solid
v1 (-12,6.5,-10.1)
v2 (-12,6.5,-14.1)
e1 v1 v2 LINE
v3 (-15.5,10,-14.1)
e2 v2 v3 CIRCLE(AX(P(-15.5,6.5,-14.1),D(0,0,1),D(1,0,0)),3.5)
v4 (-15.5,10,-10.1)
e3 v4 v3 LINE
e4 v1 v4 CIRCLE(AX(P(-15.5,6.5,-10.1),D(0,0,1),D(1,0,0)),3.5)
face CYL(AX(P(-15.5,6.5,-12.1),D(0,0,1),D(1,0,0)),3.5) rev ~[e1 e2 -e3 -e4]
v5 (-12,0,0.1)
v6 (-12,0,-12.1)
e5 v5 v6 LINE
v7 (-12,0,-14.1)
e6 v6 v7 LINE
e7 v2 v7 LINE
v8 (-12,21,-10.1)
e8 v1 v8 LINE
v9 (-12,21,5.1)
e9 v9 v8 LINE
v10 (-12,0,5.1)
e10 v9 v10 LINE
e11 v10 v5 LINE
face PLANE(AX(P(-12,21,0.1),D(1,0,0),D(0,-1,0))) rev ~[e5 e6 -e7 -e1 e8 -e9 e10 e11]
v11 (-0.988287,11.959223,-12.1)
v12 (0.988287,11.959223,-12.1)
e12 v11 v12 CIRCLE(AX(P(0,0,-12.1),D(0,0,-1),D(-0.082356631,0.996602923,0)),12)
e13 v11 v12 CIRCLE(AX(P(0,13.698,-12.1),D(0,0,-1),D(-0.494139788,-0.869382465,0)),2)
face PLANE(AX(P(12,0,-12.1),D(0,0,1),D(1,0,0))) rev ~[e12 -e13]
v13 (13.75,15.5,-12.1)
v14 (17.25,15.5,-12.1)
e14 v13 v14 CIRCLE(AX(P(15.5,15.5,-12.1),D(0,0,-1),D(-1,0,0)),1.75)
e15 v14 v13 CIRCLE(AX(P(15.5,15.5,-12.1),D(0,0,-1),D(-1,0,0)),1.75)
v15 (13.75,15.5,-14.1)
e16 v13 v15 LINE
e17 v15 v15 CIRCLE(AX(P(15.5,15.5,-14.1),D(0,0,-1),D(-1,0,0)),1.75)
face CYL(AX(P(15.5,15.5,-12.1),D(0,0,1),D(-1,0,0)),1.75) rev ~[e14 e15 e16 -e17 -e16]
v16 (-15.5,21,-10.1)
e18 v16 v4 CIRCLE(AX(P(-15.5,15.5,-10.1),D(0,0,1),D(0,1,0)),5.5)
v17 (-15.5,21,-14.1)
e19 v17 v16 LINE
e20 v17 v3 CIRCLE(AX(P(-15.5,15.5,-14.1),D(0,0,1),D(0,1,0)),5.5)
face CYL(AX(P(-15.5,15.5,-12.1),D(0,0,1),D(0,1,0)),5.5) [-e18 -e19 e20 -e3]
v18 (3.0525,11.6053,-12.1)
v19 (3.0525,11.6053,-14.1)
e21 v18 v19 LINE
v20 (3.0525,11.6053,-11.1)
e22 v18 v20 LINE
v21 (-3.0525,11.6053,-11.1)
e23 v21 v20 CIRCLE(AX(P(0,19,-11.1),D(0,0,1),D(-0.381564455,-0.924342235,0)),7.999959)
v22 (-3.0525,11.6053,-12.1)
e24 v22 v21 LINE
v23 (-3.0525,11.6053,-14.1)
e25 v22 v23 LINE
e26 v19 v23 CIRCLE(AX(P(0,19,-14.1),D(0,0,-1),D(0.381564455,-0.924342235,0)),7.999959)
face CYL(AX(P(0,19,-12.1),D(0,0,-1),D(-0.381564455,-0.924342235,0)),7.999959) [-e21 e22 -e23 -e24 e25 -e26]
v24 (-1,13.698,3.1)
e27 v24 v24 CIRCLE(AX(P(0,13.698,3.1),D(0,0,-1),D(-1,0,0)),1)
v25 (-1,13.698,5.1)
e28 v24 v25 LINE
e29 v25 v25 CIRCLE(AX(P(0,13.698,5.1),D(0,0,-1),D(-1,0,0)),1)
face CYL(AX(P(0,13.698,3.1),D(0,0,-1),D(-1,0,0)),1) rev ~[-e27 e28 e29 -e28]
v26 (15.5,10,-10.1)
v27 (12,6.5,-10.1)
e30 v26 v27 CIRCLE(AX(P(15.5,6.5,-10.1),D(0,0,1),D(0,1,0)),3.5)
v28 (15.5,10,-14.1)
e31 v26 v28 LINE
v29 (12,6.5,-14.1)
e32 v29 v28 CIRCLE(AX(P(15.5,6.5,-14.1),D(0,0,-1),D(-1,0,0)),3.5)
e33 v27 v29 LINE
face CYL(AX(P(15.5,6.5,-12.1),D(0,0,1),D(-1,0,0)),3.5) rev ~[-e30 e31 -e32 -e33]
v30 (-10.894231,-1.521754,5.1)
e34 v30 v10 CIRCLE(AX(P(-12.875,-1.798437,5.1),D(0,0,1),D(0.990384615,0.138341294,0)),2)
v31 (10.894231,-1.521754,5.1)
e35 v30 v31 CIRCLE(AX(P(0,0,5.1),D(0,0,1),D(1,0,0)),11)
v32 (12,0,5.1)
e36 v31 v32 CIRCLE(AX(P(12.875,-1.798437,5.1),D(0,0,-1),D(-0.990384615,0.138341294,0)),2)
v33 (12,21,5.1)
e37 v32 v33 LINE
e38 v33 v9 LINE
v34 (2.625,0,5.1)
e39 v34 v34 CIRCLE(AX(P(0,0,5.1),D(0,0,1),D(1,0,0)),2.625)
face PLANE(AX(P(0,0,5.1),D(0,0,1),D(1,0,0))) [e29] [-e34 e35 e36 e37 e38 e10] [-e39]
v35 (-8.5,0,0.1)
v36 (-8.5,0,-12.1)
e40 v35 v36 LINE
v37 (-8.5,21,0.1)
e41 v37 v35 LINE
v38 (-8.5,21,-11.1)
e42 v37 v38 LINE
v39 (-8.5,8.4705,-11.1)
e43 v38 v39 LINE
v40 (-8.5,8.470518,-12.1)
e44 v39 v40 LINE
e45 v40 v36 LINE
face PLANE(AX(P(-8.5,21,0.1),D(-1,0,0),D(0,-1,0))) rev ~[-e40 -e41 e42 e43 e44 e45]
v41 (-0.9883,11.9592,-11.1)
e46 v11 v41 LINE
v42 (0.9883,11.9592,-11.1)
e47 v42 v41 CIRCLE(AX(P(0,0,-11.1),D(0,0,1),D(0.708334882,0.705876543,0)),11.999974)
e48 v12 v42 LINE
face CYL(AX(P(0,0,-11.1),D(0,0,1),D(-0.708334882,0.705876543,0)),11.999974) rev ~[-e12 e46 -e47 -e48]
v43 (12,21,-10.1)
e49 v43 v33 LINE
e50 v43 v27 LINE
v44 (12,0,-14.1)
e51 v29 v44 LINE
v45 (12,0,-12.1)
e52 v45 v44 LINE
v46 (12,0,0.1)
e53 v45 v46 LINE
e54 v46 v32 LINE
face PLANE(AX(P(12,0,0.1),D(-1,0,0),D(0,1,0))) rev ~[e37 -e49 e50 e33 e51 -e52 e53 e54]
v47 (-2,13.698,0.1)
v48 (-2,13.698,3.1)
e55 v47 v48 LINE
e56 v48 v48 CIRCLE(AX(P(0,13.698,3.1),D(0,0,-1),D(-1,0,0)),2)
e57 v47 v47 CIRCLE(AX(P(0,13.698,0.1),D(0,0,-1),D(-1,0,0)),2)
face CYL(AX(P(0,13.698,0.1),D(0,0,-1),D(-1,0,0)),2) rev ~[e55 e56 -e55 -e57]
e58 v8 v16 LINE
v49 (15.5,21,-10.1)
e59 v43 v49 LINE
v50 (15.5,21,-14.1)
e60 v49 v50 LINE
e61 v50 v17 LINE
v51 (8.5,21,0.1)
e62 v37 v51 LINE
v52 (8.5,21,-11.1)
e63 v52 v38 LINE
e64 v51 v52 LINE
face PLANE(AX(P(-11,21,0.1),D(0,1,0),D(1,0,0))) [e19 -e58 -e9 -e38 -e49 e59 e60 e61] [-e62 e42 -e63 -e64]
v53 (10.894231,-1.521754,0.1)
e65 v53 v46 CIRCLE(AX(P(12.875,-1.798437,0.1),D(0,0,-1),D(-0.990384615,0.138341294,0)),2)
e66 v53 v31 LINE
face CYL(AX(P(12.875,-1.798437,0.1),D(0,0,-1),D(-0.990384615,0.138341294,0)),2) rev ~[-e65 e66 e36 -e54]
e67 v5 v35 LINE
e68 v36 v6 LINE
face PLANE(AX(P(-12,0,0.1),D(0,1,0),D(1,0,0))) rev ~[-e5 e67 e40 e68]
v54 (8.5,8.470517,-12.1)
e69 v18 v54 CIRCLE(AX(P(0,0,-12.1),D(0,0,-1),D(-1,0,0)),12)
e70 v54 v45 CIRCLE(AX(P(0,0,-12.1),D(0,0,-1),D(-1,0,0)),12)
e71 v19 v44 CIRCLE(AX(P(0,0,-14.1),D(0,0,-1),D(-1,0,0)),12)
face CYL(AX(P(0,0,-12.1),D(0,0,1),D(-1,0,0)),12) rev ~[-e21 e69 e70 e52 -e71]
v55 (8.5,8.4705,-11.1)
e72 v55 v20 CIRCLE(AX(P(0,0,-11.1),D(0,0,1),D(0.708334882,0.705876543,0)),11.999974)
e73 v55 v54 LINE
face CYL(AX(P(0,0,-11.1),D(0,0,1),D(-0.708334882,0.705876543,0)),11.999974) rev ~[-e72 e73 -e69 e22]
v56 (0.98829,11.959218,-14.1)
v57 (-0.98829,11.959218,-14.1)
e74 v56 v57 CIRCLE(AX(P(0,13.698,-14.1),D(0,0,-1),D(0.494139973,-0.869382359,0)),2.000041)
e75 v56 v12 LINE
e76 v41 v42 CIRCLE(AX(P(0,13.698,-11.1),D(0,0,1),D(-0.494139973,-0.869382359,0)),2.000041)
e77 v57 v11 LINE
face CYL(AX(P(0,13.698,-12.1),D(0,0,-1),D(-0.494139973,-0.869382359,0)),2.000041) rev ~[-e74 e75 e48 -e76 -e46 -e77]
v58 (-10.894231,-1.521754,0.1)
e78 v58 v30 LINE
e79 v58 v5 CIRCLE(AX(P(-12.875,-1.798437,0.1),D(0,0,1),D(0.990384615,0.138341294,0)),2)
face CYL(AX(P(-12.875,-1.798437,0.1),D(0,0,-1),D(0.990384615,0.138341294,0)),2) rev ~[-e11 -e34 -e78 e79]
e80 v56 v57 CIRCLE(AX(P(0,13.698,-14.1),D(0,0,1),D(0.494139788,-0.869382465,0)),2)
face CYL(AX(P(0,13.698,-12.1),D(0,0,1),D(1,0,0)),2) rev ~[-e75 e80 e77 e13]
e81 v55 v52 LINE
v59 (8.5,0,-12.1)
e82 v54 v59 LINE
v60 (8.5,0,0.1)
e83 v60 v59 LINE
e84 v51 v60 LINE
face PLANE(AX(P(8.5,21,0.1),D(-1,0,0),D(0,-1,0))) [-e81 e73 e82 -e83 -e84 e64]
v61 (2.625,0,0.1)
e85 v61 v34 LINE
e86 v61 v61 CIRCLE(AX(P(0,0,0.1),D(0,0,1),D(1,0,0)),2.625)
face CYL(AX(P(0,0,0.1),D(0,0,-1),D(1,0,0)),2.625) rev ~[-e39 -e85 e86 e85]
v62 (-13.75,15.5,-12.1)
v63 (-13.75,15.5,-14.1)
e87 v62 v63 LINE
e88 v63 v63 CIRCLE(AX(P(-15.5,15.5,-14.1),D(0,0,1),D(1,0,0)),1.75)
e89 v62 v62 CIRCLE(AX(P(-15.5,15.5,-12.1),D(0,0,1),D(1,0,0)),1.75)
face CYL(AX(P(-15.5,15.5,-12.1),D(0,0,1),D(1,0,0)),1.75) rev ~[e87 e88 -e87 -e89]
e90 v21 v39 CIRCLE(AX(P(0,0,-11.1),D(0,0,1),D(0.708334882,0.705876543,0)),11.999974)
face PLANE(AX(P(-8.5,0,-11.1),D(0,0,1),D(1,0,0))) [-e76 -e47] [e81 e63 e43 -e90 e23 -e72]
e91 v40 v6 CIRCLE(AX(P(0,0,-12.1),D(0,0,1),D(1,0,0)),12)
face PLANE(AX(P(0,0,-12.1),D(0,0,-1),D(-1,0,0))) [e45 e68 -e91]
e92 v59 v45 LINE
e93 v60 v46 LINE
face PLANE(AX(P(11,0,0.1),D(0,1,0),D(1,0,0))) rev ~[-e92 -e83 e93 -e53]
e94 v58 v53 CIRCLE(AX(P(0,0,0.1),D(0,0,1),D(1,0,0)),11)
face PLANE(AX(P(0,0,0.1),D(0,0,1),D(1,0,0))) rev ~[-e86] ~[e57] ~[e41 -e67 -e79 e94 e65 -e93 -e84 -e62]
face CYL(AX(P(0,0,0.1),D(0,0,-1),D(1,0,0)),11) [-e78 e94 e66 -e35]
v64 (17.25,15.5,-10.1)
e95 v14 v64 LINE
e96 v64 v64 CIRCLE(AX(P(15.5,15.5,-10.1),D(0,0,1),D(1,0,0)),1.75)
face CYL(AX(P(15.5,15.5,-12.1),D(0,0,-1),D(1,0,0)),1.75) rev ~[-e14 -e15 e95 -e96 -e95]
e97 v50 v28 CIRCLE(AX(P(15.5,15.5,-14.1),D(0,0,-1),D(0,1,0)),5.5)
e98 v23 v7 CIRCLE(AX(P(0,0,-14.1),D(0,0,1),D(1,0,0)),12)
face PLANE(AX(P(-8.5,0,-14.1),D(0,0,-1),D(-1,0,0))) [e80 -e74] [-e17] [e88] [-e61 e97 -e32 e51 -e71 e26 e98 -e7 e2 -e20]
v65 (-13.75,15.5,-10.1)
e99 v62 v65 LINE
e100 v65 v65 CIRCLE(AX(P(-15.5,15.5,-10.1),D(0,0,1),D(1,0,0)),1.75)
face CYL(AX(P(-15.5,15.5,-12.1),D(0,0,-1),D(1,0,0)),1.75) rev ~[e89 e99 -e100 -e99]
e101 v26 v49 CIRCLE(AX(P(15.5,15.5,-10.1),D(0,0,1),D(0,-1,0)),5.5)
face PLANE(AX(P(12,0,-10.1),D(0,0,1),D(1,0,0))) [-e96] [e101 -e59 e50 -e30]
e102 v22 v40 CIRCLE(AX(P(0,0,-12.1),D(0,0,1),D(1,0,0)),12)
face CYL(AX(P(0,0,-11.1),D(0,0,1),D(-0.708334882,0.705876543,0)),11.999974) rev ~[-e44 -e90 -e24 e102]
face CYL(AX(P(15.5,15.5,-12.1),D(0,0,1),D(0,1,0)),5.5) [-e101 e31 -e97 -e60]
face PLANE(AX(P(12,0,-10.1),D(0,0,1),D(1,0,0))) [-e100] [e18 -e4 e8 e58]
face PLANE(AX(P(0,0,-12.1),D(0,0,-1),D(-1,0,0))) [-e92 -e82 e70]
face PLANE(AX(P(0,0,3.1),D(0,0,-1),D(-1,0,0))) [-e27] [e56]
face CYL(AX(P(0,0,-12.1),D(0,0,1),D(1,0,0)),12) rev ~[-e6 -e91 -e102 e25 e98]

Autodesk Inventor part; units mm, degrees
ref_plane "Work Plane1" through (0, 0, 0.1) normal (0, 0, 1) x (1, 0, 0)
sketch "Sketch2" plane through (0, 0, 0.1) normal (0, 0, 1) x (1, 0, 0)
  arc A0 (-1.5411, 2.125) -> (1.5411, 2.125) centre (0, 0) ccw construction
  line L0 (-1.5411, 2.125) -> (1.5411, 2.125) construction
  circle A1 centre (0, 0) radius 8 construction
  line L1 (1.5, 2) -> (-1.5, 2) construction
  arc A2 (-1.5, 2) -> (1.5, 2) centre (0, 0) ccw construction
  circle A3 centre (0, 0) radius 11 projected
  circle A4 centre (-15.5, -15.5) radius 1.75 construction
  circle A5 centre (15.5, -15.5) radius 1.75 construction
  circle A6 centre (15.5, 15.5) radius 1.75 construction
  circle A7 centre (-15.5, 15.5) radius 1.75 construction
  line L2 (-21, 21) -> (21, 21) construction
  line L3 (-21, -21) -> (-21, 21) construction
  line L4 (21, -21) -> (-21, -21) construction
  line L5 (21, 21) -> (21, -21) construction
  line L6 (-11, 0) -> (-11, 21)
  line L7 (-11, 21) -> (11, 21)
  line L8 (11, 21) -> (11, 0)
  circle A8 centre (0, 0) radius 2.625
  dimension "d0" = 5.25
extrude "Extrusion1" add sketch "Sketch2" along normal blind 5
sketch "Sketch3" plane through (0, 0, 0.1) normal (0, 0, -1) x (-1, 0, 0)
  circle A0 centre (0, 13.698) radius 2.2 projected
  circle A1 centre (0, 13.698) radius 2
  point P0 (0, 0)
  dimension "d3" = 4
extrude "Extrusion2" cut sketch "Sketch3" against normal blind 3 contours A1
sketch "Sketch4" plane through (0, 13.698, 3.1) normal (0, 0, -1) x (-1, 0, 0)
  circle A0 centre (0, 0) radius 1
  circle A1 centre (0, 0) radius 2 projected
  point P0 (0, -13.698)
  dimension "d6" = 2
extrude "Extrusion3" cut sketch "Sketch4" against normal through all contours A0
sketch "Sketch5" plane through (0, 0, 0.1) normal (0, 0, -1) x (-1, 0, 0)
  circle A0 centre (0, 0) radius 8 construction
  line L0 (-8, 0) -> (-8, 21) construction
  line L1 (-11, 21) -> (11, 21) construction
  line L2 (8, 0) -> (8, 21) construction
  line L3 (-8.5, 0) -> (-8.5, 21) construction
  line L4 (8.5, 0) -> (8.5, 21) construction
  circle A1 centre (0, 0) radius 8.5 construction
  line L5 (-8.5, 0) -> (-12, 0)
  line L6 (-12, 0) -> (-12, 21)
  line L7 (-12, 21) -> (-8.5, 21)
  line L8 (-8.5, 21) -> (-8.5, 0)
  line L9 (8.5, 0) -> (12, 0)
  line L10 (12, 0) -> (12, 21)
  line L11 (12, 21) -> (8.5, 21)
  line L12 (8.5, 21) -> (8.5, 0)
  line L13 (11, 21) -> (-11, 21) projected
  dimension "d9" = 0.5
  dimension "d10" = 0.5
  dimension "d11" = 0.5
  dimension "d12" = 3.5
  dimension "d13" = 3.5
ref_plane "Work Plane2" through (-11, -11, -12.1) normal (0, 0, 1) x (1, 0, 0)
extrude "Extrusion4" add sketch "Sketch5" along normal up to surface (12.2 mm away)
sketch "Sketch6" plane through (0, 0, 0.1) normal (0, 0, 1) x (1, 0, 0)
  line L0 (-11, 0) -> (-11, 21) projected
  line L1 (-11, 21) -> (-12, 21) projected
  line L2 (-12, 21) -> (-12, 0) projected
  line L3 (-12, 0) -> (-11, 0) projected
  line L4 (11, 21) -> (11, 0) projected
  line L5 (11, 0) -> (12, 0) projected
  line L6 (12, 0) -> (12, 21) projected
  line L7 (12, 21) -> (11, 21) projected
  point P0 (0, 0)
extrude "Extrusion5" add sketch "Sketch6" along normal up to surface (5 mm away)
fillet "Fillet1" radius 2 2 edges at (11, 0, 2.6) (-11, 0, 2.6)
sketch "Sketch7" plane through (12, 0, -12.1) normal (0, 0, -1) x (-1, 0, 0)
  circle A0 centre (12, 0) radius 11 projected
  line L0 (33, 21) -> (-9, 21) construction
  circle A1 centre (27.5, -15.5) radius 1.75 construction
  circle A2 centre (-3.5, -15.5) radius 1.75 construction
  circle A3 centre (-3.5, 15.5) radius 1.75 construction
  circle A4 centre (27.5, 15.5) radius 1.75 construction
  line L1 (33, 21) -> (-9, 21) construction
  line L2 (-9, 21) -> (-9, -21) construction
  line L3 (-9, -21) -> (33, -21) construction
  line L4 (33, -21) -> (33, 21) construction
  circle A5 centre (-3.5, 15.5) radius 1.75 projected
  arc A6 (-3.5, 21) -> (-3.5, 10) centre (-3.5, 15.5) ccw
  line L5 (0, 21) -> (0, 0) projected
  arc A7 (0, 6.5) -> (-3.5, 10) centre (-3.5, 6.5) ccw
  line L6 (24, 21) -> (0, 21) projected
  line L7 (-3.5, 21) -> (0, 21)
  arc A8 (1.1058, -1.5218) -> (0, 0) centre (-0.875, -1.7984) ccw projected
  arc A9 (24, 0) -> (22.8942, -1.5218) centre (24.875, -1.7984) ccw projected
  line L8 (24, 0) -> (24, 21) projected
  circle A10 centre (12, 0) radius 12
  line L9 (0, 0) -> (3.5, 0) projected
  line L10 (0, 6.5) -> (0, 0)
  line L11 (0, 21) -> (12, 21)
  line L12 (20.5, 21) -> (3.5, 21) projected
  line L13 (12, 21) -> (12, 14.698)
  circle A11 centre (12, 13.698) radius 1 projected
  line L14 (12, 12.698) -> (12, 12)
  arc A12 (12, 12) -> (0, 0) centre (12, 0) ccw
  arc A13 (12, 14.698) -> (12, 12.698) centre (12, 13.698) ccw
  point P0 (12, 0)
  point P1 (-3.125, 21)
ref_plane "Work Plane3" through (-21, -21, -14.1) normal (0, 0, 1) x (1, 0, 0)
extrude "Extrusion6" add sketch "Sketch7" along normal up to surface (2 mm away) contours L5 L6 L13 A11 L14 A10 | A7 A6 L7 L5
mirror "Mirror1" about plane through (0, 14.698, -12.1) normal (-1, 0, 0) of "Extrusion6"
ref_plane "Work Plane4" through (0, 13.698, -11.1) normal (0, 0, -1) x (-1, 0, 0)
sketch "Sketch9" plane through (0, 13.698, -11.1) normal (0, 0, -1) x (-1, 0, 0)
  circle A0 centre (0, 0) radius 5.2 projected
  circle A1 centre (0, 0) radius 2
  line L0 (-8.5, 7.302) -> (8.5, 7.302) projected
  line L1 (8.5, 7.302) -> (8.5, -5.2275) projected
  arc A2 (8.5, -5.2275) -> (-8.5, -5.2275) centre (0, -13.698) ccw projected
  line L2 (-8.5, -5.2275) -> (-8.5, 7.302) projected
  circle A3 centre (0, 0) radius 1 projected
  arc A4 (8.5, -5.2275) -> (-8.5, -5.2275) centre (0, -13.698) ccw projected
  arc A5 (8.5, -5.2275) -> (0.9883, -1.7388) centre (0, -13.698) ccw
  arc A6 (-0.9883, -1.7388) -> (-8.5, -5.2275) centre (0, -13.698) ccw
  arc A7 (0.9883, -1.7388) -> (-0.9883, -1.7388) centre (0, 0) ccw
  line L3 (-12, 7.302) -> (-12, -7.198) projected
  arc A8 (-12, -7.198) -> (-15.5, -3.698) centre (-15.5, -7.198) ccw projected
  arc A9 (-15.5, 7.302) -> (-15.5, -3.698) centre (-15.5, 1.802) ccw projected
  line L4 (-12, 7.302) -> (-15.5, 7.302) projected
  point P0 (0, -13.698)
  dimension "d26" = 4
extrude "Extrusion8" add sketch "Sketch9" along normal up to surface (1 mm away) contours A0 A2 A1 | A0 A2 L2 L0 L1 | A1 A2 | A3 picked at (-3.5209, -0.8252) picked at (-0.5576, -1.4588)
sketch "Sketch10" plane through (12, 0, -12.1) normal (0, 0, 1) x (1, 0, 0)
  circle A0 centre (-12, 13.698) radius 1 projected
  circle A1 centre (-12, 13.698) radius 2
  point P0 (-12, 0)
  dimension "d29" = 4
extrude "Extrusion9" cut sketch "Sketch10" against normal through all
sketch "Sketch11" plane through (-8.5, 0, -12.1) normal (0, 0, -1) x (-1, 0, 0)
  circle A0 centre (-8.5, 0) radius 11 construction
  arc A1 (-20.5, 0) -> (-20.5, 0) centre (-8.5, 0) ccw construction
  arc A2 (3.5, 0) -> (-20.5, 0) centre (-8.5, 0) ccw construction
  arc A3 (-9.4883, 11.9592) -> (-17, 8.4705) centre (-8.5, 0) ccw construction
  arc A4 (-11.5525, 11.6053) -> (-5.4475, 11.6053) centre (-8.5, 19) ccw
  circle A5 centre (-8.5, 13.698) radius 2 construction
  arc A6 (-9.4883, 11.9592) -> (-7.5117, 11.9592) centre (-8.5, 13.698) ccw
  arc A7 (-5.4475, 11.6053) -> (-7.5117, 11.9592) centre (-8.5, 0) ccw
  arc A8 (-9.4883, 11.9592) -> (-11.5525, 11.6053) centre (-8.5, 0) ccw
  point P0 (-8.5, 0)
  dimension "d32" = 8
ref_plane "Work Plane5" through (-21, -21, -14.1) normal (0, 0, 1) x (1, 0, 0)
extrude "Extrusion10" add sketch "Sketch11" along normal up to surface (2 mm away)
sketch "Sketch12" plane through (-8.5, 0, -12.1) normal (0, 0, 1) x (1, 0, 0)
  arc A0 (7.5117, 11.9592) -> (9.4883, 11.9592) centre (8.5, 13.698) ccw projected
  arc A1 (7.5117, 11.9592) -> (5.4475, 11.6053) centre (8.5, 0) ccw projected
  arc A2 (5.4475, 11.6053) -> (11.5525, 11.6053) centre (8.5, 19) ccw projected
  arc A3 (11.5525, 11.6053) -> (9.4883, 11.9592) centre (8.5, 0) ccw projected
  point P0 (8.5, 0)
extrude "Extrusion11" add sketch "Sketch12" along normal up to surface (1 mm away)
sketch "Sketch13" plane through (12, 0, -12.1) normal (0, 0, 1) x (1, 0, 0)
  line L0 (0, 21) -> (0, 6.5) projected
  arc A0 (3.5, 10) -> (0, 6.5) centre (3.5, 6.5) ccw projected
  arc A1 (3.5, 10) -> (3.5, 21) centre (3.5, 15.5) ccw projected
  line L1 (0, 21) -> (3.5, 21) projected
  circle A2 centre (3.5, 15.5) radius 1.75 projected
  line L2 (-24, 6.5) -> (-24, 21) projected
  line L3 (-24, 21) -> (-27.5, 21) projected
  arc A3 (-27.5, 21) -> (-27.5, 10) centre (-27.5, 15.5) ccw projected
  arc A4 (-24, 6.5) -> (-27.5, 10) centre (-27.5, 6.5) ccw projected
  circle A5 centre (-27.5, 15.5) radius 1.75 projected
  point P0 (-12, 0)
extrude "Extrusion12" add sketch "Sketch13" along normal blind 2
properties part number "Bracket"
